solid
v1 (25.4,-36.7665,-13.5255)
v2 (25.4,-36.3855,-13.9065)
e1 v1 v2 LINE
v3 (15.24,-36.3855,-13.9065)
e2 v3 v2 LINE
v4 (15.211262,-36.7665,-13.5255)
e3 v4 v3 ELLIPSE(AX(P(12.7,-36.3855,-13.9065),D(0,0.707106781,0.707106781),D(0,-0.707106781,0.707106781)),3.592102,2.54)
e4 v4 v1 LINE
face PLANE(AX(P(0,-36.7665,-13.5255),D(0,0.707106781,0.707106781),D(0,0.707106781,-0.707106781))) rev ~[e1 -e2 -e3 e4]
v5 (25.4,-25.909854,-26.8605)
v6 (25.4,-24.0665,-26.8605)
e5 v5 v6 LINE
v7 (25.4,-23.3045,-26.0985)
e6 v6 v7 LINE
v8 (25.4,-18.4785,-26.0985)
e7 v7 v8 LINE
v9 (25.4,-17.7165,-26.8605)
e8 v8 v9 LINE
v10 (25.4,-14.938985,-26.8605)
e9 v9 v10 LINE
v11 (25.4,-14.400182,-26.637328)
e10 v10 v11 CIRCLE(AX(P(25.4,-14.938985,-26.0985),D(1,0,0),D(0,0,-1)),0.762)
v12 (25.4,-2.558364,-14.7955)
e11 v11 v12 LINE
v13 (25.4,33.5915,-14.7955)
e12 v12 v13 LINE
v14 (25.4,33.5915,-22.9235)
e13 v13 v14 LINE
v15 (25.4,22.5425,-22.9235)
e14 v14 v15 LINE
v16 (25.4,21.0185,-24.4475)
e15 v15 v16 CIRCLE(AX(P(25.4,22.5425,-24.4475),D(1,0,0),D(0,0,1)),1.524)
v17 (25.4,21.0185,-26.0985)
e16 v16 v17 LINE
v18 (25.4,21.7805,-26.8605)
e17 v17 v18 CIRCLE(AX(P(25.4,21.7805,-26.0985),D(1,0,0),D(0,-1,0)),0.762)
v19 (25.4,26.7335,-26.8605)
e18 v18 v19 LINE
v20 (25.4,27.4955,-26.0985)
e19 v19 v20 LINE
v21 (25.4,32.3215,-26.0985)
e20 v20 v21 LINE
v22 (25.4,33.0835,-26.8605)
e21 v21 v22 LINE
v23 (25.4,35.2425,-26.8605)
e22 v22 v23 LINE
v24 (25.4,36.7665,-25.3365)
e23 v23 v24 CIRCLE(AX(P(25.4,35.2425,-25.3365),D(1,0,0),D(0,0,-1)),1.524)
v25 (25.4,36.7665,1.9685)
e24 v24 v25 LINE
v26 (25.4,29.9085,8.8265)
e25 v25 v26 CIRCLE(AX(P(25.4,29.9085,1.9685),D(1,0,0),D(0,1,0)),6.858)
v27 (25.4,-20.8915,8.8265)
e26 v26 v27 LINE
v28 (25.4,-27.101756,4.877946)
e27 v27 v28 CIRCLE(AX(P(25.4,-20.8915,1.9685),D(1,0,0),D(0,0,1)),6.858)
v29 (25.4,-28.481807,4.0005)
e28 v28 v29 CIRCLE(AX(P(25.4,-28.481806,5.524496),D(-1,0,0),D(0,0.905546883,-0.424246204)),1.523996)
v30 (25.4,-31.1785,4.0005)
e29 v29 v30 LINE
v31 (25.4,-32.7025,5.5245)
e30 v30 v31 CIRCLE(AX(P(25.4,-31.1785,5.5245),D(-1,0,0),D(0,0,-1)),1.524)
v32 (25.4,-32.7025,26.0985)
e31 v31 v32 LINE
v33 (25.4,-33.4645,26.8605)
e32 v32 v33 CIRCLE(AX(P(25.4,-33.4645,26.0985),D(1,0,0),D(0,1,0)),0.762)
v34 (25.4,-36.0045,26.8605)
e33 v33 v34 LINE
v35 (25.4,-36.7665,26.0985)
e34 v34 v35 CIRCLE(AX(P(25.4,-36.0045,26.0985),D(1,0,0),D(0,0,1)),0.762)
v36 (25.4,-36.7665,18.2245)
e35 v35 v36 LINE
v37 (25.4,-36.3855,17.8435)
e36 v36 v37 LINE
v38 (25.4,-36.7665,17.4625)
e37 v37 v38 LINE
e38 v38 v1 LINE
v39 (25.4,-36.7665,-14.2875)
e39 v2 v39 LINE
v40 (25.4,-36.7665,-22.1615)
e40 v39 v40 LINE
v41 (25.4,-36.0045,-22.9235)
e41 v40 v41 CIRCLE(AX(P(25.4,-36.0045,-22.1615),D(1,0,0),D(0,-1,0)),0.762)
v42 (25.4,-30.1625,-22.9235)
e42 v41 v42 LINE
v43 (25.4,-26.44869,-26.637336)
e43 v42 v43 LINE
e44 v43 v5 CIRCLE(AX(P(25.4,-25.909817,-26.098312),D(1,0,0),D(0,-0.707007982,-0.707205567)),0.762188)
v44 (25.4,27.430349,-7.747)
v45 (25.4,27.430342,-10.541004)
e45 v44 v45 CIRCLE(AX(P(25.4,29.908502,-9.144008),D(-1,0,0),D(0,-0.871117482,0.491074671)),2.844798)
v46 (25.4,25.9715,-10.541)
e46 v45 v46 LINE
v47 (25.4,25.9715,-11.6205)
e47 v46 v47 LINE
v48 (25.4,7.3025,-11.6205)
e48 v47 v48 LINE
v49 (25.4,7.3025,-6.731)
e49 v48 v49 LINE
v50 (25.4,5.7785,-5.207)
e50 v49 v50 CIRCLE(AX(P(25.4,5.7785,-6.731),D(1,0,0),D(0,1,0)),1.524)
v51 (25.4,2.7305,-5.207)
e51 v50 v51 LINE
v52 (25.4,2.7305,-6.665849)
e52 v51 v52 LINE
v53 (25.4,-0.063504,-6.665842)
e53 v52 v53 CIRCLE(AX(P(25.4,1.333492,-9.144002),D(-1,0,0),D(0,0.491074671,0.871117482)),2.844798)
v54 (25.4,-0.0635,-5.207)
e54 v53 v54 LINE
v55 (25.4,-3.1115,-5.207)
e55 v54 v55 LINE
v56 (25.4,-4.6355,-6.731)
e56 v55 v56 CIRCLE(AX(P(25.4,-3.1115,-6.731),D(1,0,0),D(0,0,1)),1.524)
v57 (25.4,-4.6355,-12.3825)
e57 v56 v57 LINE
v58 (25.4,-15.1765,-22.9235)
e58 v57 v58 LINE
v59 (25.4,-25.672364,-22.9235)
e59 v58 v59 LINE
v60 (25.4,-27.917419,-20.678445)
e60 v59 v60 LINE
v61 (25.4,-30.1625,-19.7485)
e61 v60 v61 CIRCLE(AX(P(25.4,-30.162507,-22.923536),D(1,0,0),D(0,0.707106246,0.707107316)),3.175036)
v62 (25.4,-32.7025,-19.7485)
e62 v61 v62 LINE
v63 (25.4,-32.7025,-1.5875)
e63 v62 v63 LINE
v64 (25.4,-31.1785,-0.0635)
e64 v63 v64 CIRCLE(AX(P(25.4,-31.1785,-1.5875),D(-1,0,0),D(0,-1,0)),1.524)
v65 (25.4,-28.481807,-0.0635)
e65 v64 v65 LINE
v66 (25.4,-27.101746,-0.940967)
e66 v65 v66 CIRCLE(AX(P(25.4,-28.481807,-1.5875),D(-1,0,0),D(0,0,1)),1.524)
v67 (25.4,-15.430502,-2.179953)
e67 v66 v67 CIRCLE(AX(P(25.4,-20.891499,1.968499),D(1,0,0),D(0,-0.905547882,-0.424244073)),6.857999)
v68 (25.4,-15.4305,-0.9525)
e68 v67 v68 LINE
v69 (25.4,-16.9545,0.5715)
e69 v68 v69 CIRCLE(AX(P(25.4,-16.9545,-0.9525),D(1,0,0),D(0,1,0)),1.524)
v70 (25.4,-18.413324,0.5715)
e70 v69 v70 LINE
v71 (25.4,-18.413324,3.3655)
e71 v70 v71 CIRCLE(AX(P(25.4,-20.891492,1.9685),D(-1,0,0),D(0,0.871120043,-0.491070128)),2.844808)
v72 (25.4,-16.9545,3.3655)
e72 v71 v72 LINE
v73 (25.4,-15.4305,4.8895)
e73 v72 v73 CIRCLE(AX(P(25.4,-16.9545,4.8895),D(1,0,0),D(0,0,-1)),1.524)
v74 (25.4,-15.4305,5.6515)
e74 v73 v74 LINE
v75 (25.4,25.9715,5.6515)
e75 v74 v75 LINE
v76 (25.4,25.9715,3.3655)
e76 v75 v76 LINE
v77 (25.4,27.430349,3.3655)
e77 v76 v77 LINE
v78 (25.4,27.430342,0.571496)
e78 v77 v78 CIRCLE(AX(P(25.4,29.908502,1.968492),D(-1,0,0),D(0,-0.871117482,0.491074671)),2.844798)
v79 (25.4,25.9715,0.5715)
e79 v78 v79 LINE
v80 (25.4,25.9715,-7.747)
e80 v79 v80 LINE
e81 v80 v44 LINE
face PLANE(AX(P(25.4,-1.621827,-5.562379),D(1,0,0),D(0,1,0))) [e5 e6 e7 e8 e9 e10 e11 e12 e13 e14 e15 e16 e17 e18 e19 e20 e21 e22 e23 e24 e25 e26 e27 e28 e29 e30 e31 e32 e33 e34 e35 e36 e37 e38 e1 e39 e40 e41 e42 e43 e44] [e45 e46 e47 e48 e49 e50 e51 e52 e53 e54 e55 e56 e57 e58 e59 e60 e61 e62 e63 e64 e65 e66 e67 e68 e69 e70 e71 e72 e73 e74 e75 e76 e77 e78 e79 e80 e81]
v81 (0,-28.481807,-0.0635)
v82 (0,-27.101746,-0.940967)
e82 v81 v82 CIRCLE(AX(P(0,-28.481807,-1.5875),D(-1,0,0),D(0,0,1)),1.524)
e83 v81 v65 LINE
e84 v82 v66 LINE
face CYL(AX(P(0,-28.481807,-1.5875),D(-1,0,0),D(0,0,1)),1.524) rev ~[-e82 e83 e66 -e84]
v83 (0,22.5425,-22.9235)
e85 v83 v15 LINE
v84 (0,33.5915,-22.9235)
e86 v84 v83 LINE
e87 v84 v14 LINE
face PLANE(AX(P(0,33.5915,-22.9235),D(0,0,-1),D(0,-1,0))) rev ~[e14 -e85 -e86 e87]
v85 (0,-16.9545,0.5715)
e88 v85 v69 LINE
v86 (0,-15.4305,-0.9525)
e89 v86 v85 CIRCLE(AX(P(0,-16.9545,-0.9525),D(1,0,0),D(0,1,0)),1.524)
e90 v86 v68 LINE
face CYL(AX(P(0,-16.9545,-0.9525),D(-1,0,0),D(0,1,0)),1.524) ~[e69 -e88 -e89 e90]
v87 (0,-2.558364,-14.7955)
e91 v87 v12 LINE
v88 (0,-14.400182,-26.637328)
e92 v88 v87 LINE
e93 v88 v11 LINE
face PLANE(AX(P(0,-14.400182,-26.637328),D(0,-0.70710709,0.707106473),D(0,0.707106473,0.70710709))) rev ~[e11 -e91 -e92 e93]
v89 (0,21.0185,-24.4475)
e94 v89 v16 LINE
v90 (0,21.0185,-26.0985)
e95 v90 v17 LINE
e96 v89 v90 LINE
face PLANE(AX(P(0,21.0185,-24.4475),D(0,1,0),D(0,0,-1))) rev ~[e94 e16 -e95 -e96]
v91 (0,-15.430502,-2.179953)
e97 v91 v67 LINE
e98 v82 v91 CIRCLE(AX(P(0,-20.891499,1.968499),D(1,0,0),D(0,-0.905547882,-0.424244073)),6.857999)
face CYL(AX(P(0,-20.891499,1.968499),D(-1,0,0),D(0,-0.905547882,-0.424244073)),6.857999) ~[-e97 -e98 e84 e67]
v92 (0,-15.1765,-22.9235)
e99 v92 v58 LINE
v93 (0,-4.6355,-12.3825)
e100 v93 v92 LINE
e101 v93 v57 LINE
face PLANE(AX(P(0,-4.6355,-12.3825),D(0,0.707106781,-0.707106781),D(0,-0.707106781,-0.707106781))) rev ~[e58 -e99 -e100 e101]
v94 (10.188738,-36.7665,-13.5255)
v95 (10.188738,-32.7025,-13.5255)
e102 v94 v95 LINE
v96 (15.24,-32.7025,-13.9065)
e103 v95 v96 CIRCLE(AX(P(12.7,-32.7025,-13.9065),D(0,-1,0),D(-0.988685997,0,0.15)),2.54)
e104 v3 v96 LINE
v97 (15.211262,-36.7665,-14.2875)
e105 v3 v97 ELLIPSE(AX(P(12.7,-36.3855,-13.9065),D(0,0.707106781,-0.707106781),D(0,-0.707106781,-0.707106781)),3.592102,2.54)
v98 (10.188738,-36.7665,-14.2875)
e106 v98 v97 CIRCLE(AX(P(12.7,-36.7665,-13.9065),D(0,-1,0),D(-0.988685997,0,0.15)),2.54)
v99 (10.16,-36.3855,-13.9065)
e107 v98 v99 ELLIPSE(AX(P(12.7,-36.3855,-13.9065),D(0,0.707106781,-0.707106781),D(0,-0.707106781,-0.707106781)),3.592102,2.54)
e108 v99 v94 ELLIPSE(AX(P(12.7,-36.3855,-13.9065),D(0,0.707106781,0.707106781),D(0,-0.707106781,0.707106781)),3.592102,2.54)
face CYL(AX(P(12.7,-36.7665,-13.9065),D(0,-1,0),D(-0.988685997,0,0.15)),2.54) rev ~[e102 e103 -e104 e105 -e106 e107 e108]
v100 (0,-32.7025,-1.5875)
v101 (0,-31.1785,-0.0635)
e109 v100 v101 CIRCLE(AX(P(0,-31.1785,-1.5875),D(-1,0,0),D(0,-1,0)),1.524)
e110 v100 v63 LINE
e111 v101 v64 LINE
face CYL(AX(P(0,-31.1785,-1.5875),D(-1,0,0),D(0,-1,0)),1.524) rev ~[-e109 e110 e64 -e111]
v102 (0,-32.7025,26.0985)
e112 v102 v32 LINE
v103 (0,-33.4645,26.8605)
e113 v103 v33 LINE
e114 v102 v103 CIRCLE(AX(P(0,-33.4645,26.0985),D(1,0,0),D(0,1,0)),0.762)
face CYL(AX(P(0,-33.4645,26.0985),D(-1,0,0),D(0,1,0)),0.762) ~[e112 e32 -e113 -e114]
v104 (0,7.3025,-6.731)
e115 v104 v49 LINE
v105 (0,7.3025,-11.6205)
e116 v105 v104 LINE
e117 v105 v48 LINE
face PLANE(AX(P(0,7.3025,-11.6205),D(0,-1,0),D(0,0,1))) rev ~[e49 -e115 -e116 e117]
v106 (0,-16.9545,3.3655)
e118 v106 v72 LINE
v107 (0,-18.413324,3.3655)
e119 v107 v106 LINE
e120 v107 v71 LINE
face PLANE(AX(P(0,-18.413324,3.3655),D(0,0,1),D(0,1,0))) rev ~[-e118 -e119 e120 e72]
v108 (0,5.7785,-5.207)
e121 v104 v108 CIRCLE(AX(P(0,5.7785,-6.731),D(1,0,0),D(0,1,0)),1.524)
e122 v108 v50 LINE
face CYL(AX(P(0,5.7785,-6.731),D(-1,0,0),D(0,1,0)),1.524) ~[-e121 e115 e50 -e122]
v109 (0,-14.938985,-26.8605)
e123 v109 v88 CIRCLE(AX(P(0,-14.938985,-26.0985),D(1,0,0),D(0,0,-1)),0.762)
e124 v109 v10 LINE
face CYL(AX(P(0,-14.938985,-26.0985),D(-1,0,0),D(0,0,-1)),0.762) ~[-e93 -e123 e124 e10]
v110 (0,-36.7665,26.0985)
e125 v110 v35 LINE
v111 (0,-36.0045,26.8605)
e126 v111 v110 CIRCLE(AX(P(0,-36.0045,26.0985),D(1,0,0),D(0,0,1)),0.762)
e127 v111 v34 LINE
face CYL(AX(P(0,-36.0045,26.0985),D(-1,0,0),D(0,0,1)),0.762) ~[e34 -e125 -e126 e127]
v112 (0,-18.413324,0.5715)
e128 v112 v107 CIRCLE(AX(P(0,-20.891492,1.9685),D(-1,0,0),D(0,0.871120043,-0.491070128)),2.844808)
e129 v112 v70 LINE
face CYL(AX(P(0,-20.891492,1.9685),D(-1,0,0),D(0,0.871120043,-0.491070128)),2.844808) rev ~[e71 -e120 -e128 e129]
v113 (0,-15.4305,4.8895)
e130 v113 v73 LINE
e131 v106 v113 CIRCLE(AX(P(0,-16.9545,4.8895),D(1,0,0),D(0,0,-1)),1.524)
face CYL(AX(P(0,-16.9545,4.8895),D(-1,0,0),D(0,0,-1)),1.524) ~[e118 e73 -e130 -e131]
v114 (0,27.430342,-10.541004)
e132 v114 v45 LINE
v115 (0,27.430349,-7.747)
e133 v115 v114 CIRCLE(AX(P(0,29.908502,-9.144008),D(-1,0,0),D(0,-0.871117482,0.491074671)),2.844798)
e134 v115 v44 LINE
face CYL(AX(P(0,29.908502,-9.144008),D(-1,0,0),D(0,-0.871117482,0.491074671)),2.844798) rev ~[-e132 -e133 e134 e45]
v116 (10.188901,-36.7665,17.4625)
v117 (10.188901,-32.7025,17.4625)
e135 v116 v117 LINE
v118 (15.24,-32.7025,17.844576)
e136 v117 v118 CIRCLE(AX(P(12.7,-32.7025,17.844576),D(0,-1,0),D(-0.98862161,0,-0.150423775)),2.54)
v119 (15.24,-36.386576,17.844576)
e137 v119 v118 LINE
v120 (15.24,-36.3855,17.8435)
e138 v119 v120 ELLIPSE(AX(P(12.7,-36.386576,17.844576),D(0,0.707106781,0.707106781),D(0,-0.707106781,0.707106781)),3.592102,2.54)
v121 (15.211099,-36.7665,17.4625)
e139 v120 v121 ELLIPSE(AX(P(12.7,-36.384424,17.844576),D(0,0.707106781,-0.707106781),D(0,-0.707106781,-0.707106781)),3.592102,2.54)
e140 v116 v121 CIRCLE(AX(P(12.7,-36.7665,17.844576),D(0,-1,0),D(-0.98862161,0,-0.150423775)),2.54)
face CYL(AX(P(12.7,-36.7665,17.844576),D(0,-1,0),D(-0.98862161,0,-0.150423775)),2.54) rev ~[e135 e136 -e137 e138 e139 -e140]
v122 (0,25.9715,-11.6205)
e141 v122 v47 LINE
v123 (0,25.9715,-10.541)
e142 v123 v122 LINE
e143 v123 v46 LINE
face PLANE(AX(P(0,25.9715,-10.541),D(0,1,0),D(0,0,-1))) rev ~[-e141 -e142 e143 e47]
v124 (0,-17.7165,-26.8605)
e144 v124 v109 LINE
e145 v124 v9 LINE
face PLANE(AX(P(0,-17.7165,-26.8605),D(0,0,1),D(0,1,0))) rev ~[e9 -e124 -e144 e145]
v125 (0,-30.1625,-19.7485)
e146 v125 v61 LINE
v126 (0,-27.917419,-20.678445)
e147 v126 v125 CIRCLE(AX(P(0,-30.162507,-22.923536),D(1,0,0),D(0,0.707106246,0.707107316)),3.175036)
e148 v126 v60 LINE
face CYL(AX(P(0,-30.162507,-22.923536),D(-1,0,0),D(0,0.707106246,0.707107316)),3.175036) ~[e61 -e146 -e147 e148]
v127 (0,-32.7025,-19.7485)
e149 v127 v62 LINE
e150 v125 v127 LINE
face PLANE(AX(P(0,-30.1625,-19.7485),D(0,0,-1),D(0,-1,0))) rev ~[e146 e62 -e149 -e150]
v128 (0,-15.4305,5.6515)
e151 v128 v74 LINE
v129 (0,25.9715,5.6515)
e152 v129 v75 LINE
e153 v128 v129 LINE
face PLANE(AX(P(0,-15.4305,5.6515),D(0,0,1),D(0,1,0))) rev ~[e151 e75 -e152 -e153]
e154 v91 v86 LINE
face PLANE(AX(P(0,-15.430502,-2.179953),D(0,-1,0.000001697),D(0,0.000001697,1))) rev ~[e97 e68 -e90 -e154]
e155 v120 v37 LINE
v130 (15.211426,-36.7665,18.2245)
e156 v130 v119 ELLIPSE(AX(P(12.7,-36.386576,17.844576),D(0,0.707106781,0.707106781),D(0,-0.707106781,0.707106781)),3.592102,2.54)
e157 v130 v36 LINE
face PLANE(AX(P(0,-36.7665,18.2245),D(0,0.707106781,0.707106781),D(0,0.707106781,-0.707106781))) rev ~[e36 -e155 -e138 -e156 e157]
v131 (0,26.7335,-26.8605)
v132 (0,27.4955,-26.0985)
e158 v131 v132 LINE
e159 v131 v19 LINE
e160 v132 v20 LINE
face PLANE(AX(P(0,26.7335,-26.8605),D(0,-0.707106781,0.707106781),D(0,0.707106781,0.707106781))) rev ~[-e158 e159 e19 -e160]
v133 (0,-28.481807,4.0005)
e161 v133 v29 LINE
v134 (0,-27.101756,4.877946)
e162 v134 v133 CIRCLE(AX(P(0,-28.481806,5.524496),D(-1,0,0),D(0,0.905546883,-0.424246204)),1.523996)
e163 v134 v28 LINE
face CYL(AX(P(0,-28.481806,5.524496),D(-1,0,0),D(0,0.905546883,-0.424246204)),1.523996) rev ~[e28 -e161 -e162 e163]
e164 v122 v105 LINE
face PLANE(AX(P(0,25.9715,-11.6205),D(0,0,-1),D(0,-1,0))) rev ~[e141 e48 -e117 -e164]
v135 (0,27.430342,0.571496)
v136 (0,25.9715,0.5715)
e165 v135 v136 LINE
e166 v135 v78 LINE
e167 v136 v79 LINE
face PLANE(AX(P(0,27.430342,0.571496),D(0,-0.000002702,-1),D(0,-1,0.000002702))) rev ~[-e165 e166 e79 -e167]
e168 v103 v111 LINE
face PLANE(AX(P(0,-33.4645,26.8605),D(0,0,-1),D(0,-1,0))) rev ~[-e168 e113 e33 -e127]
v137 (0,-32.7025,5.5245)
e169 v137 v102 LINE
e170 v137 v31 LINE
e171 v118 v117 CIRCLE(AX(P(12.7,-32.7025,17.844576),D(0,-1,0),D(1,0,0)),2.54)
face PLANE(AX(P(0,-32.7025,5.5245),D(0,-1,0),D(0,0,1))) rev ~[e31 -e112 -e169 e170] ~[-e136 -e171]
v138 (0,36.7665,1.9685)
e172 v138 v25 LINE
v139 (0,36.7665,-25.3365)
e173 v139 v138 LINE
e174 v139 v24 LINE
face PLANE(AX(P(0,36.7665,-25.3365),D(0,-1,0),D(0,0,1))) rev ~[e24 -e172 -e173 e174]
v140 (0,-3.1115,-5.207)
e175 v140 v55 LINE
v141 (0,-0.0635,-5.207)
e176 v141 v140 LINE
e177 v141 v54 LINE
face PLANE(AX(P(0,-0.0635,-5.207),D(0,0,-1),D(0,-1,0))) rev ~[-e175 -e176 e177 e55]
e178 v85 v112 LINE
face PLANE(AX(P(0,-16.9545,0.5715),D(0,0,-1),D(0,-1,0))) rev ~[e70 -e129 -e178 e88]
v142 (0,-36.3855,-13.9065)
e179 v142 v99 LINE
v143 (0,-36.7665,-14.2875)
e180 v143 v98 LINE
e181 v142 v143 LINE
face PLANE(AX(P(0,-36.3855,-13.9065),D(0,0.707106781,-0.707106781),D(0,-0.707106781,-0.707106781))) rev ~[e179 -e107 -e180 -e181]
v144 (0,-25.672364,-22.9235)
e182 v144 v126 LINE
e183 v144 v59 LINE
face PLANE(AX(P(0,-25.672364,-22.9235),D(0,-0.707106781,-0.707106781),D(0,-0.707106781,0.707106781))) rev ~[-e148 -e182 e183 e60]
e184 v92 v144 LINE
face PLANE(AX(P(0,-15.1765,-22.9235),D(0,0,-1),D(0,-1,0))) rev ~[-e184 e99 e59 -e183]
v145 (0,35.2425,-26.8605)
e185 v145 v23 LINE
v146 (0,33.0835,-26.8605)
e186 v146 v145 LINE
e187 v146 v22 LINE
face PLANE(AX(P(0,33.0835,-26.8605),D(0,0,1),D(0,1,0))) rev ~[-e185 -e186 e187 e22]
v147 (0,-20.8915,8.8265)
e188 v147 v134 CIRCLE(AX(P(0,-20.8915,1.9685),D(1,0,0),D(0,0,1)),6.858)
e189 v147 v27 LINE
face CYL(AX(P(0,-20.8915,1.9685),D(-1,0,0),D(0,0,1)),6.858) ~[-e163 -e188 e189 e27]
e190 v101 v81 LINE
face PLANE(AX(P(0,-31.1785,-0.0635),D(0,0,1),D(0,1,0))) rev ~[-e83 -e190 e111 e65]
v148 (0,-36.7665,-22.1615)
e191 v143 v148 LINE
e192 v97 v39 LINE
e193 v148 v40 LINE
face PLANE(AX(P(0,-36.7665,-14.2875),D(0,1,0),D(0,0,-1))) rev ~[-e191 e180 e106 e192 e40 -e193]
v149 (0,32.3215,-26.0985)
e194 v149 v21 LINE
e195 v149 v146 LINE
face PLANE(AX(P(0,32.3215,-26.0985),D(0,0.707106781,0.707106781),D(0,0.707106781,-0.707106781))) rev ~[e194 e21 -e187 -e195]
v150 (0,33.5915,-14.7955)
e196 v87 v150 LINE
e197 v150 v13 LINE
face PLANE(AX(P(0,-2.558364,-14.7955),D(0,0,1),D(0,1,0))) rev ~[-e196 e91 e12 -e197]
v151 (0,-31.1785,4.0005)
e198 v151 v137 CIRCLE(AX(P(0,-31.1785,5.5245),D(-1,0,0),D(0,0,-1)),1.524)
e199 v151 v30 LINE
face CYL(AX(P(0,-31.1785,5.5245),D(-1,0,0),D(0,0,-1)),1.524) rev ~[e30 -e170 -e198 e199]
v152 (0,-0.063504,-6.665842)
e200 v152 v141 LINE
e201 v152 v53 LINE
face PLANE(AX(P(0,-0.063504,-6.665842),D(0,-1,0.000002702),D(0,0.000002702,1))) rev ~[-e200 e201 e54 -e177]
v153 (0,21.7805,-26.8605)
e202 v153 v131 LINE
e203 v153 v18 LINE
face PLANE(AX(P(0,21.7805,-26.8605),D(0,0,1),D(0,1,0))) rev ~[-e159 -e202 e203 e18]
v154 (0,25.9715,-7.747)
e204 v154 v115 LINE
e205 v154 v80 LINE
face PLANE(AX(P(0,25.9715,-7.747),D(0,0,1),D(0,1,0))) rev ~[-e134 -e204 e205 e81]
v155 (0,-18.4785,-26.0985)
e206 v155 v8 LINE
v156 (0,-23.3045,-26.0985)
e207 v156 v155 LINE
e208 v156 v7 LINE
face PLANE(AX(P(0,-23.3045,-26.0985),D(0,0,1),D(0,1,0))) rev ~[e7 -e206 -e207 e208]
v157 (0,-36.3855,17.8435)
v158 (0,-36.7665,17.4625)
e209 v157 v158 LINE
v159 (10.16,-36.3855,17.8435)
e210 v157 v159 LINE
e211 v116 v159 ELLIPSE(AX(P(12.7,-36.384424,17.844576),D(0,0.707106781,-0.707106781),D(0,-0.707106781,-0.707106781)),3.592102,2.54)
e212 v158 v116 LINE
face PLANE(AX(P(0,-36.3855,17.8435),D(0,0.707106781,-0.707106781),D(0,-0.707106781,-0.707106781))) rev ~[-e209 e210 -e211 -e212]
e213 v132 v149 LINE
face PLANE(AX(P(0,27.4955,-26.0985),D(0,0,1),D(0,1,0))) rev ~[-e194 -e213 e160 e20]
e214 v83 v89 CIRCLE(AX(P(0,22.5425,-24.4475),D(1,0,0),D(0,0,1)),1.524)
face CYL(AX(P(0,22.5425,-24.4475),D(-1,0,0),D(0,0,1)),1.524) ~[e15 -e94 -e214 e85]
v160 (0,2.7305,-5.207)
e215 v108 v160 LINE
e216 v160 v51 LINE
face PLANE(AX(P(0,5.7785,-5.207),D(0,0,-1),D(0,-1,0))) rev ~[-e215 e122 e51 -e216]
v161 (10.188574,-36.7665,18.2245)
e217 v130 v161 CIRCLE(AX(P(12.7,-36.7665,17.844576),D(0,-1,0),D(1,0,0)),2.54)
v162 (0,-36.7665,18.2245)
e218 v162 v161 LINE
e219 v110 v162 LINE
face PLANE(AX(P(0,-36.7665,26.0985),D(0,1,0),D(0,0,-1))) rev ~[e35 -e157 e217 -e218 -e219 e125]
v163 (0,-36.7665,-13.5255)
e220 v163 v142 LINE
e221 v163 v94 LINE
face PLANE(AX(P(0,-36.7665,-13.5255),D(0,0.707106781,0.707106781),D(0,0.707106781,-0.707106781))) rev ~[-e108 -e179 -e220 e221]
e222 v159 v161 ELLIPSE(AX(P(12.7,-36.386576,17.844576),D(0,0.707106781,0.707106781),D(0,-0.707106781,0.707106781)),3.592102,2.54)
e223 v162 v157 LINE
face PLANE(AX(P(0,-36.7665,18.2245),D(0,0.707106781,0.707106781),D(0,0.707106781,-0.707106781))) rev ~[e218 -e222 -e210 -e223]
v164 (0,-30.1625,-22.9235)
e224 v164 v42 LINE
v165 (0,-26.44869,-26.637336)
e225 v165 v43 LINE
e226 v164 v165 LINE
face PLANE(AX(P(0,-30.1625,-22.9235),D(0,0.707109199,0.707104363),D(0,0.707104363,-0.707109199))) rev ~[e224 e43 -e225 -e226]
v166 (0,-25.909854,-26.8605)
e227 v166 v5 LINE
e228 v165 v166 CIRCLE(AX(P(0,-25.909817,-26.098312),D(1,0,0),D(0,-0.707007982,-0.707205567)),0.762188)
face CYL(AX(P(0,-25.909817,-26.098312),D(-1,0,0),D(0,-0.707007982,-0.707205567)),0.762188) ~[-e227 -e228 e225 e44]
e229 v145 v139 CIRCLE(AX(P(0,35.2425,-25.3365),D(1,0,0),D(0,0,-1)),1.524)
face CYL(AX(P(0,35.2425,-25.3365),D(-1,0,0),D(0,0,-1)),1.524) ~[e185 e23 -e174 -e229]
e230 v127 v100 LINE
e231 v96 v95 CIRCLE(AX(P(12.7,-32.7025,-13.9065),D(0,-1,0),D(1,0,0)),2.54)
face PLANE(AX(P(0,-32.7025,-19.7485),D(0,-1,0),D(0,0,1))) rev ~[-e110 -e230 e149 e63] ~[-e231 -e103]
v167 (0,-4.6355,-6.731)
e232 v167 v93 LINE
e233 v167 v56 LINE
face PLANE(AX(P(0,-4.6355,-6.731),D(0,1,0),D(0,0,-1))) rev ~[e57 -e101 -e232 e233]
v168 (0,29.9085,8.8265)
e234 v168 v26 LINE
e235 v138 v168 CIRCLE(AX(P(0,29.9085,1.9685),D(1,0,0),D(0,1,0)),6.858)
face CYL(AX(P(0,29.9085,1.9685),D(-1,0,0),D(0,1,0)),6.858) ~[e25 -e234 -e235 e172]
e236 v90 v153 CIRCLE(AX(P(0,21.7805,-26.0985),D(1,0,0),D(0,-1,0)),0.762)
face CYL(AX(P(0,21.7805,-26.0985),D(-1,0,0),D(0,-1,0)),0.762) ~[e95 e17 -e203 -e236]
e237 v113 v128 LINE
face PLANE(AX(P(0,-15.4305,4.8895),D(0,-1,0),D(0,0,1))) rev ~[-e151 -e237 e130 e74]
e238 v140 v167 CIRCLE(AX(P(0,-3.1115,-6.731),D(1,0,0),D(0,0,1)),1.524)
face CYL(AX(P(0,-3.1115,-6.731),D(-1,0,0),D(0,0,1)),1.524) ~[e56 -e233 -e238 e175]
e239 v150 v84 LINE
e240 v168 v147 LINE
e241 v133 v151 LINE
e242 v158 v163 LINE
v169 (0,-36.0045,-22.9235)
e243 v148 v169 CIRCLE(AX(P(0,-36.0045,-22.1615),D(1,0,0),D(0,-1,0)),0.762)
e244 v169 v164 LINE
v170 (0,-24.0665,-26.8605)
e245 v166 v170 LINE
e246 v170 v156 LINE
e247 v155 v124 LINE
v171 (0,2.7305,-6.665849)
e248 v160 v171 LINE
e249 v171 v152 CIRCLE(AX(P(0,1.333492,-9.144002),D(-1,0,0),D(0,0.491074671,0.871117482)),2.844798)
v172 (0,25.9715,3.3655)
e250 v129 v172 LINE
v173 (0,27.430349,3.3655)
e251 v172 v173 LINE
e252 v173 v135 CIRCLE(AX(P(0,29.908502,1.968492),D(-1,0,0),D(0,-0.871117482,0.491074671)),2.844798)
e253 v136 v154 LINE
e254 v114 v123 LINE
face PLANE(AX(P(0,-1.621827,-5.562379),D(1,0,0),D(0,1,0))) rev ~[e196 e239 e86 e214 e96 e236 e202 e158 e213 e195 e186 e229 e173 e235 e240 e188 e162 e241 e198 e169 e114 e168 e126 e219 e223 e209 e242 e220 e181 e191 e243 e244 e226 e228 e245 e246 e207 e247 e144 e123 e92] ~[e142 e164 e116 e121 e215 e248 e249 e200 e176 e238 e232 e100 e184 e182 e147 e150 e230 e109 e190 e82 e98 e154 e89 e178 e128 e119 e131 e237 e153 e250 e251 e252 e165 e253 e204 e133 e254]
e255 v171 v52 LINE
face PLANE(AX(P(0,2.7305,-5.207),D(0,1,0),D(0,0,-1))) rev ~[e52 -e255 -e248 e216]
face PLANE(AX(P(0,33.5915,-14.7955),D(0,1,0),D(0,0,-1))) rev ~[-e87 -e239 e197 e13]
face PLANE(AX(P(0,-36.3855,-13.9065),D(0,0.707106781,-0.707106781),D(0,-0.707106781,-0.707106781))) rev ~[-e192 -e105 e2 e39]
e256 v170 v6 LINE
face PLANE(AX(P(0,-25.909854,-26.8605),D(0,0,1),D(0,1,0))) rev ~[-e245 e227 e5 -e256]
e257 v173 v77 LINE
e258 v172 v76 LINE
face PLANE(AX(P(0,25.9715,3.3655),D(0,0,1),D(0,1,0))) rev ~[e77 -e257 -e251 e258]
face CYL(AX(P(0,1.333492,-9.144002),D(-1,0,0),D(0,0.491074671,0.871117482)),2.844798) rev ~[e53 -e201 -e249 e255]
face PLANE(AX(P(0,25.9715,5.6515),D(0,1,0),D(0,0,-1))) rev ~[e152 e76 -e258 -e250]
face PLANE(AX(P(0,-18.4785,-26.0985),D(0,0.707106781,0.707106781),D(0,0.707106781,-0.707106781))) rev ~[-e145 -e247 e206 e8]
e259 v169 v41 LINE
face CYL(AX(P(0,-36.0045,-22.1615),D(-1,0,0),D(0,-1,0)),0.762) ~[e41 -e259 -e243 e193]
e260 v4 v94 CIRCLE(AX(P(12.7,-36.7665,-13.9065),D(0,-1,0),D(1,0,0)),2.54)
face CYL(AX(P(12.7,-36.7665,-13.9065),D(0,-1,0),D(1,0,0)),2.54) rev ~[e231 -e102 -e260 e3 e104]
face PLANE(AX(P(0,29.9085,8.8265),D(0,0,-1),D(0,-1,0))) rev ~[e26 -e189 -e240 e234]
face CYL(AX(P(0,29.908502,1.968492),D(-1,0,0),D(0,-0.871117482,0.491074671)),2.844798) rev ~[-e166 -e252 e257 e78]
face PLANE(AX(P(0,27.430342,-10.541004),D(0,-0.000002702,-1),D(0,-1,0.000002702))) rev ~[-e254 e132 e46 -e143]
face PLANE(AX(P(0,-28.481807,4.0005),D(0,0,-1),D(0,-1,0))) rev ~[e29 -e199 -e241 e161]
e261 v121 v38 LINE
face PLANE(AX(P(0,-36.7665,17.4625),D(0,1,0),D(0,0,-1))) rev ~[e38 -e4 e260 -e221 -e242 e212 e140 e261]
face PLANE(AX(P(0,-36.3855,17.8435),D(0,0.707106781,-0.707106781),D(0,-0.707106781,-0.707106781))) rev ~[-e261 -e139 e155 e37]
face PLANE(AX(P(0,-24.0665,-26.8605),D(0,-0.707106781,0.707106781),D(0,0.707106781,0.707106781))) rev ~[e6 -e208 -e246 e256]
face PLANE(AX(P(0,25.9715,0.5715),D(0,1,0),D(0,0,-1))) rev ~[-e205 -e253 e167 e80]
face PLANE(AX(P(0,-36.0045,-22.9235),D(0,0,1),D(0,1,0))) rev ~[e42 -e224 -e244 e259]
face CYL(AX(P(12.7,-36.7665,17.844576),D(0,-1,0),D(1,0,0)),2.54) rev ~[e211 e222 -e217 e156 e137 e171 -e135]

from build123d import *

# Parameters (mm, degrees)
F1_DEPTH = 25.4
F3_DEPTH = 25.4


# Not quite as in the source:
# - ends of sketch curves that miss each other by under 0.0002 mm in the source are joined


with BuildPart() as f1:
    # F0 (on Right) → F1 (new body)
    with BuildSketch(Plane.YZ):
        with BuildLine():
            Line((-36.7665, 26.0985), (-36.7665, 18.2245))
            Line((-36.7665, 18.2245), (-36.3855, 17.8435))
            Line((-36.3855, 17.8435), (-36.7665, 17.4625))
            Line((-36.7665, 17.4625), (-36.7665, -13.5255))
            Line((-36.7665, -13.5255), (-36.3855, -13.9065))
            Line((-36.3855, -13.9065), (-36.7665, -14.2875))
            Line((-36.7665, -14.2875), (-36.7665, -22.1615))
            ThreePointArc((-36.7665, -22.1615), (-36.5433153673, -22.7003153673), (-36.0045, -22.9235))
            Line((-36.0045, -22.9235), (-30.1625, -22.9235))
            Line((-30.1625, -22.9235), (-26.4486898, -26.6373356))
            ThreePointArc((-26.4486898, -26.6373356), (-26.2014589755, -26.8024962038), (-25.9098542, -26.8605))
            Line((-25.9098542, -26.8605), (-24.0665, -26.8605))
            Line((-24.0665, -26.8605), (-23.3045, -26.0985))
            Line((-23.3045, -26.0985), (-18.4785, -26.0985))
            Line((-18.4785, -26.0985), (-17.7165, -26.8605))
            Line((-17.7165, -26.8605), (-14.9389846, -26.8605))
            ThreePointArc((-14.9389846, -26.8605), (-14.6473881211, -26.8024996403), (-14.4001819327, -26.6373280669))
            Line((-14.4001819327, -26.6373280669), (-2.5583642, -14.7955))
            Line((-2.5583642, -14.7955), (33.5915, -14.7955))
            Line((33.5915, -14.7955), (33.5915, -22.9235))
            Line((33.5915, -22.9235), (22.5425, -22.9235))
            ThreePointArc((22.5425, -22.9235), (21.4648692655, -23.3698692655), (21.0185, -24.4475))
            Line((21.0185, -24.4475), (21.0185, -26.0985))
            ThreePointArc((21.0185, -26.0985), (21.2416846327, -26.6373153673), (21.7805, -26.8605))
            Line((21.7805, -26.8605), (26.7335, -26.8605))
            Line((26.7335, -26.8605), (27.4955, -26.0985))
            Line((27.4955, -26.0985), (32.3215, -26.0985))
            Line((32.3215, -26.0985), (33.0835, -26.8605))
            Line((33.0835, -26.8605), (35.2425, -26.8605))
            ThreePointArc((35.2425, -26.8605), (36.3201307345, -26.4141307345), (36.7665, -25.3365))
            Line((36.7665, -25.3365), (36.7665, 1.9685))
            ThreePointArc((36.7665, 1.9685), (34.7578383054, 6.8178383054), (29.9085, 8.8265))
            Line((29.9085, 8.8265), (-20.8915, 8.8265))
            ThreePointArc((-20.8915, 8.8265), (-24.5711182212, 7.7557768852), (-27.1017564824, 4.8779464117))
            ThreePointArc((-27.1017564824, 4.8779464117), (-27.6641193484, 4.2384353631), (-28.4818074, 4.0005))
            Line((-28.4818074, 4.0005), (-31.1785, 4.0005))
            ThreePointArc((-31.1785, 4.0005), (-32.2561307345, 4.4468692655), (-32.7025, 5.5245))
            Line((-32.7025, 5.5245), (-32.7025, 26.0985))
            ThreePointArc((-32.7025, 26.0985), (-32.9256846327, 26.6373153673), (-33.4645, 26.8605))
            Line((-33.4645, 26.8605), (-36.0045, 26.8605))
            ThreePointArc((-36.0045, 26.8605), (-36.5433153673, 26.6373153673), (-36.7665, 26.0985))
        make_face()
        with BuildLine():
            Line((-18.4133236, 3.3655), (-16.9545, 3.3655))
            ThreePointArc((-16.9545, 3.3655), (-15.8768692655, 3.8118692655), (-15.4305, 4.8895))
            Line((-15.4305, 4.8895), (-15.4305, 5.6515))
            Line((-15.4305, 5.6515), (25.9715, 5.6515))
            Line((25.9715, 5.6515), (25.9715, 3.3655))
            Line((25.9715, 3.3655), (27.430349, 3.3655))
            ThreePointArc((27.430349, 3.3655), (32.7533, 1.9685), (27.4303420089, 0.5714960589))
            Line((27.4303420089, 0.5714960589), (25.9715, 0.5715))
            Line((25.9715, 0.5715), (25.9715, -7.747))
            Line((25.9715, -7.747), (27.430349, -7.747))
            ThreePointArc((27.430349, -7.747), (32.7533, -9.144), (27.4303420089, -10.5410039411))
            Line((27.4303420089, -10.5410039411), (25.9715, -10.541))
            Line((25.9715, -10.541), (25.9715, -11.6205))
            Line((25.9715, -11.6205), (7.3025, -11.6205))
            Line((7.3025, -11.6205), (7.3025, -6.731))
            ThreePointArc((7.3025, -6.731), (6.8561307345, -5.6533692655), (5.7785, -5.207))
            Line((5.7785, -5.207), (2.7305, -5.207))
            Line((2.7305, -5.207), (2.7305, -6.665849))
            ThreePointArc((2.7305, -6.665849), (1.3335, -11.9888), (-0.0635039411, -6.6658420089))
            Line((-0.0635039411, -6.6658420089), (-0.0635, -5.207))
            Line((-0.0635, -5.207), (-3.1115, -5.207))
            ThreePointArc((-3.1115, -5.207), (-4.1891307345, -5.6533692655), (-4.6355, -6.731))
            Line((-4.6355, -6.731), (-4.6355, -12.3825))
            Line((-4.6355, -12.3825), (-15.1765, -22.9235))
            Line((-15.1765, -22.9235), (-25.6723642, -22.9235))
            Line((-25.6723642, -22.9235), (-27.9174194, -20.6784448))
            ThreePointArc((-27.9174194, -20.6784448), (-28.9474718056, -19.9901859209), (-30.1625, -19.7485))
            Line((-30.1625, -19.7485), (-32.7025, -19.7485))
            Line((-32.7025, -19.7485), (-32.7025, -1.5875))
            ThreePointArc((-32.7025, -1.5875), (-32.2561307345, -0.5098692655), (-31.1785, -0.0635))
            Line((-31.1785, -0.0635), (-28.4818074, -0.0635))
            ThreePointArc((-28.4818074, -0.0635), (-27.6641096434, -0.3014415336), (-27.1017455591, -0.9409666943))
            ThreePointArc((-27.1017455591, -0.9409666943), (-21.615457962, -4.8511809947), (-15.4305020835, -2.1799534173))
            Line((-15.4305020835, -2.1799534173), (-15.4305, -0.9525))
            ThreePointArc((-15.4305, -0.9525), (-15.8768692655, 0.1251307345), (-16.9545, 0.5715))
            Line((-16.9545, 0.5715), (-18.4133236, 0.5715))
            ThreePointArc((-18.4133236, 0.5715), (-23.7363, 1.9685), (-18.4133236, 3.3655))
        make_face(mode=Mode.SUBTRACT)
    extrude(amount=F1_DEPTH)

    # F2 (on face) → F3 (cut)
    with BuildSketch(Plane.XZ.offset(36.7665)):
        with BuildLine():
            ThreePointArc((10.1889011104, 17.4625), (12.8915839509, 15.311811972), (15.24, 17.8445763886))
            ThreePointArc((15.24, 17.8445763886), (12.5084160491, 20.3773408052), (10.1889011104, 17.4625))
        make_face()
        with BuildLine():
            ThreePointArc((10.1887375685, -13.5255), (12.5089588736, -16.4393054185), (15.24, -13.9065))
            ThreePointArc((15.24, -13.9065), (12.8910411264, -11.3736945815), (10.1887375685, -13.5255))
        make_face()
    extrude(amount=-F3_DEPTH, mode=Mode.SUBTRACT)


solid = f1.part
